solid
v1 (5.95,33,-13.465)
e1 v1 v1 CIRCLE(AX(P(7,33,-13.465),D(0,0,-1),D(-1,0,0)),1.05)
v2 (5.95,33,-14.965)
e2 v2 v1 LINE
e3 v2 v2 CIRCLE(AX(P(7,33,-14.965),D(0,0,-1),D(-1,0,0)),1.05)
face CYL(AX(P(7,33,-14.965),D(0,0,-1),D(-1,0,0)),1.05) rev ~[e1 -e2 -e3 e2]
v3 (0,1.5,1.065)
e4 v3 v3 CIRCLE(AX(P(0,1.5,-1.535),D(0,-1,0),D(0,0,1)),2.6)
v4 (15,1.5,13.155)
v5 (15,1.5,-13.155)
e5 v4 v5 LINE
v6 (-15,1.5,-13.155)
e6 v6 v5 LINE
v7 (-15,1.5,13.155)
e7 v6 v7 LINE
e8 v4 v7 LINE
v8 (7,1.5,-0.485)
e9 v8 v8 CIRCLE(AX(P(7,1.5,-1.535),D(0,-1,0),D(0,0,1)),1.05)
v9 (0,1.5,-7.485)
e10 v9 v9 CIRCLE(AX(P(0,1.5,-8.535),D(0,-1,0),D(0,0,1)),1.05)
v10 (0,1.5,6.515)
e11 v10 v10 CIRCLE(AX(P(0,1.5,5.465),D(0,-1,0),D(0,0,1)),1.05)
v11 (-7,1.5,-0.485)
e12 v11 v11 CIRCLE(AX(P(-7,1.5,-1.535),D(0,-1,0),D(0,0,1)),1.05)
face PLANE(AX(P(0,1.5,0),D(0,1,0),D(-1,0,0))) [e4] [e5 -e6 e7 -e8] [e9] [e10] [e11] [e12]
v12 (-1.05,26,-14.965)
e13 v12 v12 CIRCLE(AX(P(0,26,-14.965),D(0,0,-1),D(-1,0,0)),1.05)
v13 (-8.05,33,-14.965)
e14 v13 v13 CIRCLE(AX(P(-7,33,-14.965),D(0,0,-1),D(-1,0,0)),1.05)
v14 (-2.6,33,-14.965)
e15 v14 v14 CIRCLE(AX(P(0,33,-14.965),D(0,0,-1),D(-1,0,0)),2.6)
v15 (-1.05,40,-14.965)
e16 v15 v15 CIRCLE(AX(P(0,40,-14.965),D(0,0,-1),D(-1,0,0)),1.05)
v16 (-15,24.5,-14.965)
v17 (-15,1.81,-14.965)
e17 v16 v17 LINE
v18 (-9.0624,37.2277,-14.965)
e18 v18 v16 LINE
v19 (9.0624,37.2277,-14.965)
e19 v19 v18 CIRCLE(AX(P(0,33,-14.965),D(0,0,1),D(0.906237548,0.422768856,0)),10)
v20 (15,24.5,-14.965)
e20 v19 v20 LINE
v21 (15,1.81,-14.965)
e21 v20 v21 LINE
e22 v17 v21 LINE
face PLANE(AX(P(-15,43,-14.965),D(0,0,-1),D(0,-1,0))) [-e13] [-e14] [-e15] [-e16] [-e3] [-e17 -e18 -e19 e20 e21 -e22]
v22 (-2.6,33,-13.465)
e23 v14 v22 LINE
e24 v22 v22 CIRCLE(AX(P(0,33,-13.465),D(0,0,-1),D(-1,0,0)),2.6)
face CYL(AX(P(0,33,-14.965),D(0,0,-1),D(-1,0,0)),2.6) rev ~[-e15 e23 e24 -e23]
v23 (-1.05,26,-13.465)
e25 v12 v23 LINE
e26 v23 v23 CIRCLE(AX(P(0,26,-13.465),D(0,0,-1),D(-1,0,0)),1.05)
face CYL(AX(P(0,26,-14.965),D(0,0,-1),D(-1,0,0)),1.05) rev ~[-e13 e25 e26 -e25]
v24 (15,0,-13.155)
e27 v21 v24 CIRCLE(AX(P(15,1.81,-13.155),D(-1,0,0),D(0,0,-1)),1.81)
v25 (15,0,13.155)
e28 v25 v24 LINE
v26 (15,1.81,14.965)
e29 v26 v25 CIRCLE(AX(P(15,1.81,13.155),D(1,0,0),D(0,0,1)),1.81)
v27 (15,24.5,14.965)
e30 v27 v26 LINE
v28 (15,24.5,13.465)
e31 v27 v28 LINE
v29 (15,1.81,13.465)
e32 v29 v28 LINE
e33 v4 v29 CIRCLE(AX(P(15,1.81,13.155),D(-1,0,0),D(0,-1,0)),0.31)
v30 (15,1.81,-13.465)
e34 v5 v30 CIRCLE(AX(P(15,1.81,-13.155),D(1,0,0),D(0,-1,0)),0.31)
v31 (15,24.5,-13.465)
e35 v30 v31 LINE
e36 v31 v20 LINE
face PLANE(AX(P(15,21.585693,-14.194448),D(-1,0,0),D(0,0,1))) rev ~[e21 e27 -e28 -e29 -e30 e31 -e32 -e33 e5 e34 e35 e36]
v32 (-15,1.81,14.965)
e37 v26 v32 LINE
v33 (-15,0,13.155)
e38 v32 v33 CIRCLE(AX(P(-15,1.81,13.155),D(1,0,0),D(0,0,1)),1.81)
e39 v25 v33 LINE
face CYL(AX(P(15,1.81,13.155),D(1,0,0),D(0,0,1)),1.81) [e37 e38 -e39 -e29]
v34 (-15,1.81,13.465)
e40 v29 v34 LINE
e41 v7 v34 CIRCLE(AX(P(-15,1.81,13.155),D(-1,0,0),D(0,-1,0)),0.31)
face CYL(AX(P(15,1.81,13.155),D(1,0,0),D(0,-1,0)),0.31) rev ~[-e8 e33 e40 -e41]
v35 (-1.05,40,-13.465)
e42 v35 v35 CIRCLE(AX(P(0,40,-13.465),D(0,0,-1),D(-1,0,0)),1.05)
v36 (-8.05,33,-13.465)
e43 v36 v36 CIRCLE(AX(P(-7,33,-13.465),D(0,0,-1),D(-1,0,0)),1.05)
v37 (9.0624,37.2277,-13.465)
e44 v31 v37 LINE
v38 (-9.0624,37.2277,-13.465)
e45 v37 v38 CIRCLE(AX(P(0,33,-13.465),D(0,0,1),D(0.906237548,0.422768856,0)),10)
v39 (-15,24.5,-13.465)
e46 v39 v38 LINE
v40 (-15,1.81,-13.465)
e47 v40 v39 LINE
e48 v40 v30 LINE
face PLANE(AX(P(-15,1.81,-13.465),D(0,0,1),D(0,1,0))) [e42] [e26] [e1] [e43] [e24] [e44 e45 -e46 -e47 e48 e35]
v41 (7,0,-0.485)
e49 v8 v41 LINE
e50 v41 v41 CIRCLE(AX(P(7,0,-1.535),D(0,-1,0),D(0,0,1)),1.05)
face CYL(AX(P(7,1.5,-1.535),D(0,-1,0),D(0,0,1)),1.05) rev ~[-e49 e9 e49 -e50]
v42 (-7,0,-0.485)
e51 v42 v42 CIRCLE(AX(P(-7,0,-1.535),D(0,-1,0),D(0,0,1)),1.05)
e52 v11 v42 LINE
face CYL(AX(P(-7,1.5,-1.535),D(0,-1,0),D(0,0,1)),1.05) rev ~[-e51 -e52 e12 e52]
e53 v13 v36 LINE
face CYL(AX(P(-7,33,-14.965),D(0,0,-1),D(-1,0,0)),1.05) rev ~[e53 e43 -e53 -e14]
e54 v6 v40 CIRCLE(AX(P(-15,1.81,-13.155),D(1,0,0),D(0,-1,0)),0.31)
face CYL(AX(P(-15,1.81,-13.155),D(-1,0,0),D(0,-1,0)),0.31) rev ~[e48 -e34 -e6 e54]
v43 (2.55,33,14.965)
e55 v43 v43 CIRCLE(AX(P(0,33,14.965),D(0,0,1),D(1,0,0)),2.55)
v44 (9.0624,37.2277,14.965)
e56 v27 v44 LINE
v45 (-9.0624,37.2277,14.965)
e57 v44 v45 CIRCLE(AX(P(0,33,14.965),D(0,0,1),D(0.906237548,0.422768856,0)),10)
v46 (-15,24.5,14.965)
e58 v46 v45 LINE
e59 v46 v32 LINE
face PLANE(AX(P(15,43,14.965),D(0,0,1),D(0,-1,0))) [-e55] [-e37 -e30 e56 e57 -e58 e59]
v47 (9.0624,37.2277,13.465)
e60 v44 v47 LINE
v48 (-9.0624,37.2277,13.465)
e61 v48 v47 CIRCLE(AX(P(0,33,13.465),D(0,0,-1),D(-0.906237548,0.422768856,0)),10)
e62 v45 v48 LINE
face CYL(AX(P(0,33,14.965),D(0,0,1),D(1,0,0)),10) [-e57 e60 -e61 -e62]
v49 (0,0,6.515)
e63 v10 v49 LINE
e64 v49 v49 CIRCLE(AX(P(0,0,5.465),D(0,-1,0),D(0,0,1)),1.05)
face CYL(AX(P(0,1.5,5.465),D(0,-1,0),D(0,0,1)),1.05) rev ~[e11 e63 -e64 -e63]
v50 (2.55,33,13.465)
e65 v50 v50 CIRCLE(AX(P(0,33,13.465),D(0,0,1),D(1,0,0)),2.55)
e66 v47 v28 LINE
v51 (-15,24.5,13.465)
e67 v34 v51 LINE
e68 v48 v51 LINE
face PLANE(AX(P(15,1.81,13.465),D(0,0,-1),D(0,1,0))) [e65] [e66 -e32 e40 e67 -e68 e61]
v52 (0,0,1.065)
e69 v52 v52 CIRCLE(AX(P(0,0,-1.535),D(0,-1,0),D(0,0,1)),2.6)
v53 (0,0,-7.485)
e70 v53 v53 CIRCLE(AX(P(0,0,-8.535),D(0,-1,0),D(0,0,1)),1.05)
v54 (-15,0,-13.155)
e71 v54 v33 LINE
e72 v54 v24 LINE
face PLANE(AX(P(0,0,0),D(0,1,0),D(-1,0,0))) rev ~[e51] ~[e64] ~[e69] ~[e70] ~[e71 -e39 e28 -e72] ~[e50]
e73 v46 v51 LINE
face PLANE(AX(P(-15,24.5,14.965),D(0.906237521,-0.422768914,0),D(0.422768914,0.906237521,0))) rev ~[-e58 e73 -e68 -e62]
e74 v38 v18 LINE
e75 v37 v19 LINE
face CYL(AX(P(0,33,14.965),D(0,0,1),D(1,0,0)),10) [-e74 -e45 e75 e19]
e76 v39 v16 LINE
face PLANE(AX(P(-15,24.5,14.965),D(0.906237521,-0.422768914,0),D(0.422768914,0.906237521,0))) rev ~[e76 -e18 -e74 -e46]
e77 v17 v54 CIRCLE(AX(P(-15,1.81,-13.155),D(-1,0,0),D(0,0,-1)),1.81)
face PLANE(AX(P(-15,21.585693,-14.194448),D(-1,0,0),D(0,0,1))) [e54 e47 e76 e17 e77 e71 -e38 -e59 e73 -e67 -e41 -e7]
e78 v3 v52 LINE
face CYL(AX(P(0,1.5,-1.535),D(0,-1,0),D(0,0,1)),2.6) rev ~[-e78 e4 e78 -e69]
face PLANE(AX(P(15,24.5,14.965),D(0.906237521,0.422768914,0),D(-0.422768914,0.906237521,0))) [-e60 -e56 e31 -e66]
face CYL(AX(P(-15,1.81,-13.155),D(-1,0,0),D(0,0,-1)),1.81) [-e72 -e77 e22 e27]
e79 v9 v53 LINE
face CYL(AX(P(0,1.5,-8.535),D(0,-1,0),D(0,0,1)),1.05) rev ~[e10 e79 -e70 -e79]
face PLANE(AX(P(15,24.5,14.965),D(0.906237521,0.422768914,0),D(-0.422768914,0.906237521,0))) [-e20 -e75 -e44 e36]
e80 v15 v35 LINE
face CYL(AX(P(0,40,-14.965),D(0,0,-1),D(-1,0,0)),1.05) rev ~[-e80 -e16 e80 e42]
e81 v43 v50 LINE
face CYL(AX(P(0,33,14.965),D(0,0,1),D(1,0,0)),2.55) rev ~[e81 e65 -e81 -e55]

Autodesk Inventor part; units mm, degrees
ref_plane "YZ Plane" through (0, 0, 0) normal (1, 0, 0) x (0, 1, 0)
ref_plane "XZ Plane" through (0, 0, 0) normal (0, 1, 0) x (-1, 0, 0)
ref_plane "XY Plane" through (0, 0, 0) normal (0, 0, 1) x (1, 0, 0)
sketch "Sketch1" plane through (0, 0, 0) normal (0, 1, 0) x (-1, 0, 0)
  line L0 (15, 14.965) -> (-15, 14.965)
  line L1 (-15, 14.965) -> (-15, -14.965)
  line L2 (-15, -14.965) -> (15, -14.965)
  line L3 (15, -14.965) -> (15, 14.965)
  point P0 (0, 0)
  dimension "d0" = 29.93
  dimension "d1" = 30
  dimension "d2" = 15
  dimension "d3" = 14.965
extrude "Plate1" add sketch "Sketch1" along normal blind 1.5
sketch "Sketch2" plane through (-15, 0, -13.465) normal (0, 0, -1) x (-1, 0, 0)
  line L0 (-30, 0) -> (0, 0)
  line L1 (0, 0) -> (0, 43)
  line L2 (0, 43) -> (-30, 43)
  line L3 (-30, 43) -> (-30, 0)
edge flange "Flange1" height 43 angle 90 thickness 1.5 bend radius 0.31 thickness toward (0, 0, -1) relief tear relief width 1.5 relief depth 0.75 corner gap 0.31 corner form 0 edges at (0, 1.5, -14.965) (0, 1.5, 14.965) wall of the first edge with corners at (15, 0, -13.465) (-15, 0, -13.465) (-15, 43, -13.465) (15, 43, -13.465)
bend "Bend1"
corner "Corner1"
sketch "Sketch3" plane through (-15, 43, 14.965) normal (0, 0, 1) x (1, 0, 0)
  line L0 (0, 0) -> (30, 0) projected
  line L1 (0, -41.19) -> (0, 0) projected
  circle A0 centre (15, -10) radius 10
  line L2 (0, -18.5) -> (30, -18.5)
  line L3 (30, -18.5) -> (30, -28.5)
  line L4 (30, -28.5) -> (0, -28.5)
  line L5 (0, -28.5) -> (0, -18.5)
  line L6 (30, -18.5) -> (24.0624, -5.7723)
  line L7 (0, -18.5) -> (5.9376, -5.7723)
  line L8 (0, 0) -> (30, 0)
  line L9 (30, 0) -> (30, -25)
  line L10 (30, -25) -> (0, -25)
  line L11 (0, -25) -> (0, 0)
  point P0 (15, -43)
  point P1 (15, 0)
  dimension "d15" = 10
  dimension "d16" = 0
  dimension "d17" = 20
  dimension "d18" = 8.5
  dimension "d19" = 0
  dimension "d20" = 30
  dimension "d21" = 10
  dimension "d22" = 25
extrude "Extrusion1" cut sketch "Sketch3" against normal blind 35 contours L0 A0 L7 L1 | L0 L9 L6 A0
sketch "Sketch4" plane through (15, 1.81, -14.965) normal (0, 0, -1) x (-1, 0, 0)
  arc A0 (24.0624, 35.4177) -> (5.9376, 35.4177) centre (15, 31.19) ccw projected
  circle A1 centre (15, 31.19) radius 2.6
  circle A2 centre (8, 31.19) radius 1.05
  circle A3 centre (22, 31.19) radius 1.05
  circle A4 centre (15, 38.19) radius 1.05
  circle A5 centre (15, 24.19) radius 1.05
  point P0 (15, -1.81)
  dimension "d25" = 5.2
  dimension "d26" = 0
  dimension "d27" = 7
  dimension "d28" = 2.1
  dimension "d29" = 7
  dimension "d30" = 0
  dimension "d31" = 2.1
  dimension "d32" = 0
  dimension "d33" = 7
  dimension "d34" = 2.1
  dimension "d35" = 7
  dimension "d36" = 0
  dimension "d37" = 2.1
extrude "Extrusion2" cut sketch "Sketch4" against normal blind 1.5
sketch "Sketch5" plane through (-15, 1.81, 14.965) normal (0, 0, 1) x (1, 0, 0)
  arc A0 (24.0624, 35.4177) -> (5.9376, 35.4177) centre (15, 31.19) ccw projected
  circle A1 centre (15, 31.19) radius 2.55
  point P0 (15, -1.81)
  dimension "d40" = 5.1
extrude "Extrusion3" cut sketch "Sketch5" against normal blind 1.5
sketch "Sketch6" plane through (0, 1.5, 0) normal (0, 1, 0) x (1, 0, 0)
  circle A0 centre (-7, 1.535) radius 0.7835 projected
  circle A1 centre (0, 8.535) radius 0.7835 projected
  circle A2 centre (7, 1.535) radius 0.7835 projected
  circle A3 centre (0, -5.465) radius 0.7835 projected
  circle A4 centre (0, 1.535) radius 1.75 projected
  circle A5 centre (0, 1.535) radius 9.96 projected
  point P0 (0, 0)
hole "Hole1" at (-7, 1.5, -1.535) at (0, 1.5, 5.465) at (7, 1.5, -1.535) at (0, 1.5, -8.535) direction (0, -1, 0) diameter 2.1 depth 1.5
sketch "Sketch7" plane through (0, 1.5, 0) normal (0, 1, 0) x (1, 0, 0)
  circle A0 centre (0, 1.535) radius 1.75 projected
  point P0 (0, 0)
hole "Hole2" at (0, 1.5, -1.535) direction (0, -1, 0) diameter 5.2 depth 1.5 clearance for "Hex Head Bolt" size "M5" standard "Ansi Metric M Profile"
equation "\"d48\" = Thickness"
equation "\"d55\" = Thickness"
equation "\"d4\" = Thickness"
equation "\"d5\" = BendReliefWidth"
equation "\"d6\" = BendReliefDepth"
equation "\"d7\" = MinimumRemnant"
equation "\"d8\" = TransitionRadius"
equation "\"d11\" = BendRadius"
equation "\"d12\" = CornerReliefSize"
equation "\"d13\" = GapSize"
equation "\"d14\" = JacobiRadiusSize"
equation "\"BendReliefWidth\" = Thickness"
equation "\"BendReliefDepth\" = 0.5 * Thickness"
equation "\"CornerReliefSize\" = 4 * Thickness"
equation "\"MinimumRemnant\" = 2 * Thickness"
equation "\"TransitionRadius\" = BendRadius"
equation "\"JacobiRadiusSize\" = BendRadius"
equation "\"GapSize\" = Thickness"
equation "\"Thickness\" = 1.5"
equation "\"BendRadius\" = 0.31"
properties part number "partpart" material "Aluminum 6061-AHC"
